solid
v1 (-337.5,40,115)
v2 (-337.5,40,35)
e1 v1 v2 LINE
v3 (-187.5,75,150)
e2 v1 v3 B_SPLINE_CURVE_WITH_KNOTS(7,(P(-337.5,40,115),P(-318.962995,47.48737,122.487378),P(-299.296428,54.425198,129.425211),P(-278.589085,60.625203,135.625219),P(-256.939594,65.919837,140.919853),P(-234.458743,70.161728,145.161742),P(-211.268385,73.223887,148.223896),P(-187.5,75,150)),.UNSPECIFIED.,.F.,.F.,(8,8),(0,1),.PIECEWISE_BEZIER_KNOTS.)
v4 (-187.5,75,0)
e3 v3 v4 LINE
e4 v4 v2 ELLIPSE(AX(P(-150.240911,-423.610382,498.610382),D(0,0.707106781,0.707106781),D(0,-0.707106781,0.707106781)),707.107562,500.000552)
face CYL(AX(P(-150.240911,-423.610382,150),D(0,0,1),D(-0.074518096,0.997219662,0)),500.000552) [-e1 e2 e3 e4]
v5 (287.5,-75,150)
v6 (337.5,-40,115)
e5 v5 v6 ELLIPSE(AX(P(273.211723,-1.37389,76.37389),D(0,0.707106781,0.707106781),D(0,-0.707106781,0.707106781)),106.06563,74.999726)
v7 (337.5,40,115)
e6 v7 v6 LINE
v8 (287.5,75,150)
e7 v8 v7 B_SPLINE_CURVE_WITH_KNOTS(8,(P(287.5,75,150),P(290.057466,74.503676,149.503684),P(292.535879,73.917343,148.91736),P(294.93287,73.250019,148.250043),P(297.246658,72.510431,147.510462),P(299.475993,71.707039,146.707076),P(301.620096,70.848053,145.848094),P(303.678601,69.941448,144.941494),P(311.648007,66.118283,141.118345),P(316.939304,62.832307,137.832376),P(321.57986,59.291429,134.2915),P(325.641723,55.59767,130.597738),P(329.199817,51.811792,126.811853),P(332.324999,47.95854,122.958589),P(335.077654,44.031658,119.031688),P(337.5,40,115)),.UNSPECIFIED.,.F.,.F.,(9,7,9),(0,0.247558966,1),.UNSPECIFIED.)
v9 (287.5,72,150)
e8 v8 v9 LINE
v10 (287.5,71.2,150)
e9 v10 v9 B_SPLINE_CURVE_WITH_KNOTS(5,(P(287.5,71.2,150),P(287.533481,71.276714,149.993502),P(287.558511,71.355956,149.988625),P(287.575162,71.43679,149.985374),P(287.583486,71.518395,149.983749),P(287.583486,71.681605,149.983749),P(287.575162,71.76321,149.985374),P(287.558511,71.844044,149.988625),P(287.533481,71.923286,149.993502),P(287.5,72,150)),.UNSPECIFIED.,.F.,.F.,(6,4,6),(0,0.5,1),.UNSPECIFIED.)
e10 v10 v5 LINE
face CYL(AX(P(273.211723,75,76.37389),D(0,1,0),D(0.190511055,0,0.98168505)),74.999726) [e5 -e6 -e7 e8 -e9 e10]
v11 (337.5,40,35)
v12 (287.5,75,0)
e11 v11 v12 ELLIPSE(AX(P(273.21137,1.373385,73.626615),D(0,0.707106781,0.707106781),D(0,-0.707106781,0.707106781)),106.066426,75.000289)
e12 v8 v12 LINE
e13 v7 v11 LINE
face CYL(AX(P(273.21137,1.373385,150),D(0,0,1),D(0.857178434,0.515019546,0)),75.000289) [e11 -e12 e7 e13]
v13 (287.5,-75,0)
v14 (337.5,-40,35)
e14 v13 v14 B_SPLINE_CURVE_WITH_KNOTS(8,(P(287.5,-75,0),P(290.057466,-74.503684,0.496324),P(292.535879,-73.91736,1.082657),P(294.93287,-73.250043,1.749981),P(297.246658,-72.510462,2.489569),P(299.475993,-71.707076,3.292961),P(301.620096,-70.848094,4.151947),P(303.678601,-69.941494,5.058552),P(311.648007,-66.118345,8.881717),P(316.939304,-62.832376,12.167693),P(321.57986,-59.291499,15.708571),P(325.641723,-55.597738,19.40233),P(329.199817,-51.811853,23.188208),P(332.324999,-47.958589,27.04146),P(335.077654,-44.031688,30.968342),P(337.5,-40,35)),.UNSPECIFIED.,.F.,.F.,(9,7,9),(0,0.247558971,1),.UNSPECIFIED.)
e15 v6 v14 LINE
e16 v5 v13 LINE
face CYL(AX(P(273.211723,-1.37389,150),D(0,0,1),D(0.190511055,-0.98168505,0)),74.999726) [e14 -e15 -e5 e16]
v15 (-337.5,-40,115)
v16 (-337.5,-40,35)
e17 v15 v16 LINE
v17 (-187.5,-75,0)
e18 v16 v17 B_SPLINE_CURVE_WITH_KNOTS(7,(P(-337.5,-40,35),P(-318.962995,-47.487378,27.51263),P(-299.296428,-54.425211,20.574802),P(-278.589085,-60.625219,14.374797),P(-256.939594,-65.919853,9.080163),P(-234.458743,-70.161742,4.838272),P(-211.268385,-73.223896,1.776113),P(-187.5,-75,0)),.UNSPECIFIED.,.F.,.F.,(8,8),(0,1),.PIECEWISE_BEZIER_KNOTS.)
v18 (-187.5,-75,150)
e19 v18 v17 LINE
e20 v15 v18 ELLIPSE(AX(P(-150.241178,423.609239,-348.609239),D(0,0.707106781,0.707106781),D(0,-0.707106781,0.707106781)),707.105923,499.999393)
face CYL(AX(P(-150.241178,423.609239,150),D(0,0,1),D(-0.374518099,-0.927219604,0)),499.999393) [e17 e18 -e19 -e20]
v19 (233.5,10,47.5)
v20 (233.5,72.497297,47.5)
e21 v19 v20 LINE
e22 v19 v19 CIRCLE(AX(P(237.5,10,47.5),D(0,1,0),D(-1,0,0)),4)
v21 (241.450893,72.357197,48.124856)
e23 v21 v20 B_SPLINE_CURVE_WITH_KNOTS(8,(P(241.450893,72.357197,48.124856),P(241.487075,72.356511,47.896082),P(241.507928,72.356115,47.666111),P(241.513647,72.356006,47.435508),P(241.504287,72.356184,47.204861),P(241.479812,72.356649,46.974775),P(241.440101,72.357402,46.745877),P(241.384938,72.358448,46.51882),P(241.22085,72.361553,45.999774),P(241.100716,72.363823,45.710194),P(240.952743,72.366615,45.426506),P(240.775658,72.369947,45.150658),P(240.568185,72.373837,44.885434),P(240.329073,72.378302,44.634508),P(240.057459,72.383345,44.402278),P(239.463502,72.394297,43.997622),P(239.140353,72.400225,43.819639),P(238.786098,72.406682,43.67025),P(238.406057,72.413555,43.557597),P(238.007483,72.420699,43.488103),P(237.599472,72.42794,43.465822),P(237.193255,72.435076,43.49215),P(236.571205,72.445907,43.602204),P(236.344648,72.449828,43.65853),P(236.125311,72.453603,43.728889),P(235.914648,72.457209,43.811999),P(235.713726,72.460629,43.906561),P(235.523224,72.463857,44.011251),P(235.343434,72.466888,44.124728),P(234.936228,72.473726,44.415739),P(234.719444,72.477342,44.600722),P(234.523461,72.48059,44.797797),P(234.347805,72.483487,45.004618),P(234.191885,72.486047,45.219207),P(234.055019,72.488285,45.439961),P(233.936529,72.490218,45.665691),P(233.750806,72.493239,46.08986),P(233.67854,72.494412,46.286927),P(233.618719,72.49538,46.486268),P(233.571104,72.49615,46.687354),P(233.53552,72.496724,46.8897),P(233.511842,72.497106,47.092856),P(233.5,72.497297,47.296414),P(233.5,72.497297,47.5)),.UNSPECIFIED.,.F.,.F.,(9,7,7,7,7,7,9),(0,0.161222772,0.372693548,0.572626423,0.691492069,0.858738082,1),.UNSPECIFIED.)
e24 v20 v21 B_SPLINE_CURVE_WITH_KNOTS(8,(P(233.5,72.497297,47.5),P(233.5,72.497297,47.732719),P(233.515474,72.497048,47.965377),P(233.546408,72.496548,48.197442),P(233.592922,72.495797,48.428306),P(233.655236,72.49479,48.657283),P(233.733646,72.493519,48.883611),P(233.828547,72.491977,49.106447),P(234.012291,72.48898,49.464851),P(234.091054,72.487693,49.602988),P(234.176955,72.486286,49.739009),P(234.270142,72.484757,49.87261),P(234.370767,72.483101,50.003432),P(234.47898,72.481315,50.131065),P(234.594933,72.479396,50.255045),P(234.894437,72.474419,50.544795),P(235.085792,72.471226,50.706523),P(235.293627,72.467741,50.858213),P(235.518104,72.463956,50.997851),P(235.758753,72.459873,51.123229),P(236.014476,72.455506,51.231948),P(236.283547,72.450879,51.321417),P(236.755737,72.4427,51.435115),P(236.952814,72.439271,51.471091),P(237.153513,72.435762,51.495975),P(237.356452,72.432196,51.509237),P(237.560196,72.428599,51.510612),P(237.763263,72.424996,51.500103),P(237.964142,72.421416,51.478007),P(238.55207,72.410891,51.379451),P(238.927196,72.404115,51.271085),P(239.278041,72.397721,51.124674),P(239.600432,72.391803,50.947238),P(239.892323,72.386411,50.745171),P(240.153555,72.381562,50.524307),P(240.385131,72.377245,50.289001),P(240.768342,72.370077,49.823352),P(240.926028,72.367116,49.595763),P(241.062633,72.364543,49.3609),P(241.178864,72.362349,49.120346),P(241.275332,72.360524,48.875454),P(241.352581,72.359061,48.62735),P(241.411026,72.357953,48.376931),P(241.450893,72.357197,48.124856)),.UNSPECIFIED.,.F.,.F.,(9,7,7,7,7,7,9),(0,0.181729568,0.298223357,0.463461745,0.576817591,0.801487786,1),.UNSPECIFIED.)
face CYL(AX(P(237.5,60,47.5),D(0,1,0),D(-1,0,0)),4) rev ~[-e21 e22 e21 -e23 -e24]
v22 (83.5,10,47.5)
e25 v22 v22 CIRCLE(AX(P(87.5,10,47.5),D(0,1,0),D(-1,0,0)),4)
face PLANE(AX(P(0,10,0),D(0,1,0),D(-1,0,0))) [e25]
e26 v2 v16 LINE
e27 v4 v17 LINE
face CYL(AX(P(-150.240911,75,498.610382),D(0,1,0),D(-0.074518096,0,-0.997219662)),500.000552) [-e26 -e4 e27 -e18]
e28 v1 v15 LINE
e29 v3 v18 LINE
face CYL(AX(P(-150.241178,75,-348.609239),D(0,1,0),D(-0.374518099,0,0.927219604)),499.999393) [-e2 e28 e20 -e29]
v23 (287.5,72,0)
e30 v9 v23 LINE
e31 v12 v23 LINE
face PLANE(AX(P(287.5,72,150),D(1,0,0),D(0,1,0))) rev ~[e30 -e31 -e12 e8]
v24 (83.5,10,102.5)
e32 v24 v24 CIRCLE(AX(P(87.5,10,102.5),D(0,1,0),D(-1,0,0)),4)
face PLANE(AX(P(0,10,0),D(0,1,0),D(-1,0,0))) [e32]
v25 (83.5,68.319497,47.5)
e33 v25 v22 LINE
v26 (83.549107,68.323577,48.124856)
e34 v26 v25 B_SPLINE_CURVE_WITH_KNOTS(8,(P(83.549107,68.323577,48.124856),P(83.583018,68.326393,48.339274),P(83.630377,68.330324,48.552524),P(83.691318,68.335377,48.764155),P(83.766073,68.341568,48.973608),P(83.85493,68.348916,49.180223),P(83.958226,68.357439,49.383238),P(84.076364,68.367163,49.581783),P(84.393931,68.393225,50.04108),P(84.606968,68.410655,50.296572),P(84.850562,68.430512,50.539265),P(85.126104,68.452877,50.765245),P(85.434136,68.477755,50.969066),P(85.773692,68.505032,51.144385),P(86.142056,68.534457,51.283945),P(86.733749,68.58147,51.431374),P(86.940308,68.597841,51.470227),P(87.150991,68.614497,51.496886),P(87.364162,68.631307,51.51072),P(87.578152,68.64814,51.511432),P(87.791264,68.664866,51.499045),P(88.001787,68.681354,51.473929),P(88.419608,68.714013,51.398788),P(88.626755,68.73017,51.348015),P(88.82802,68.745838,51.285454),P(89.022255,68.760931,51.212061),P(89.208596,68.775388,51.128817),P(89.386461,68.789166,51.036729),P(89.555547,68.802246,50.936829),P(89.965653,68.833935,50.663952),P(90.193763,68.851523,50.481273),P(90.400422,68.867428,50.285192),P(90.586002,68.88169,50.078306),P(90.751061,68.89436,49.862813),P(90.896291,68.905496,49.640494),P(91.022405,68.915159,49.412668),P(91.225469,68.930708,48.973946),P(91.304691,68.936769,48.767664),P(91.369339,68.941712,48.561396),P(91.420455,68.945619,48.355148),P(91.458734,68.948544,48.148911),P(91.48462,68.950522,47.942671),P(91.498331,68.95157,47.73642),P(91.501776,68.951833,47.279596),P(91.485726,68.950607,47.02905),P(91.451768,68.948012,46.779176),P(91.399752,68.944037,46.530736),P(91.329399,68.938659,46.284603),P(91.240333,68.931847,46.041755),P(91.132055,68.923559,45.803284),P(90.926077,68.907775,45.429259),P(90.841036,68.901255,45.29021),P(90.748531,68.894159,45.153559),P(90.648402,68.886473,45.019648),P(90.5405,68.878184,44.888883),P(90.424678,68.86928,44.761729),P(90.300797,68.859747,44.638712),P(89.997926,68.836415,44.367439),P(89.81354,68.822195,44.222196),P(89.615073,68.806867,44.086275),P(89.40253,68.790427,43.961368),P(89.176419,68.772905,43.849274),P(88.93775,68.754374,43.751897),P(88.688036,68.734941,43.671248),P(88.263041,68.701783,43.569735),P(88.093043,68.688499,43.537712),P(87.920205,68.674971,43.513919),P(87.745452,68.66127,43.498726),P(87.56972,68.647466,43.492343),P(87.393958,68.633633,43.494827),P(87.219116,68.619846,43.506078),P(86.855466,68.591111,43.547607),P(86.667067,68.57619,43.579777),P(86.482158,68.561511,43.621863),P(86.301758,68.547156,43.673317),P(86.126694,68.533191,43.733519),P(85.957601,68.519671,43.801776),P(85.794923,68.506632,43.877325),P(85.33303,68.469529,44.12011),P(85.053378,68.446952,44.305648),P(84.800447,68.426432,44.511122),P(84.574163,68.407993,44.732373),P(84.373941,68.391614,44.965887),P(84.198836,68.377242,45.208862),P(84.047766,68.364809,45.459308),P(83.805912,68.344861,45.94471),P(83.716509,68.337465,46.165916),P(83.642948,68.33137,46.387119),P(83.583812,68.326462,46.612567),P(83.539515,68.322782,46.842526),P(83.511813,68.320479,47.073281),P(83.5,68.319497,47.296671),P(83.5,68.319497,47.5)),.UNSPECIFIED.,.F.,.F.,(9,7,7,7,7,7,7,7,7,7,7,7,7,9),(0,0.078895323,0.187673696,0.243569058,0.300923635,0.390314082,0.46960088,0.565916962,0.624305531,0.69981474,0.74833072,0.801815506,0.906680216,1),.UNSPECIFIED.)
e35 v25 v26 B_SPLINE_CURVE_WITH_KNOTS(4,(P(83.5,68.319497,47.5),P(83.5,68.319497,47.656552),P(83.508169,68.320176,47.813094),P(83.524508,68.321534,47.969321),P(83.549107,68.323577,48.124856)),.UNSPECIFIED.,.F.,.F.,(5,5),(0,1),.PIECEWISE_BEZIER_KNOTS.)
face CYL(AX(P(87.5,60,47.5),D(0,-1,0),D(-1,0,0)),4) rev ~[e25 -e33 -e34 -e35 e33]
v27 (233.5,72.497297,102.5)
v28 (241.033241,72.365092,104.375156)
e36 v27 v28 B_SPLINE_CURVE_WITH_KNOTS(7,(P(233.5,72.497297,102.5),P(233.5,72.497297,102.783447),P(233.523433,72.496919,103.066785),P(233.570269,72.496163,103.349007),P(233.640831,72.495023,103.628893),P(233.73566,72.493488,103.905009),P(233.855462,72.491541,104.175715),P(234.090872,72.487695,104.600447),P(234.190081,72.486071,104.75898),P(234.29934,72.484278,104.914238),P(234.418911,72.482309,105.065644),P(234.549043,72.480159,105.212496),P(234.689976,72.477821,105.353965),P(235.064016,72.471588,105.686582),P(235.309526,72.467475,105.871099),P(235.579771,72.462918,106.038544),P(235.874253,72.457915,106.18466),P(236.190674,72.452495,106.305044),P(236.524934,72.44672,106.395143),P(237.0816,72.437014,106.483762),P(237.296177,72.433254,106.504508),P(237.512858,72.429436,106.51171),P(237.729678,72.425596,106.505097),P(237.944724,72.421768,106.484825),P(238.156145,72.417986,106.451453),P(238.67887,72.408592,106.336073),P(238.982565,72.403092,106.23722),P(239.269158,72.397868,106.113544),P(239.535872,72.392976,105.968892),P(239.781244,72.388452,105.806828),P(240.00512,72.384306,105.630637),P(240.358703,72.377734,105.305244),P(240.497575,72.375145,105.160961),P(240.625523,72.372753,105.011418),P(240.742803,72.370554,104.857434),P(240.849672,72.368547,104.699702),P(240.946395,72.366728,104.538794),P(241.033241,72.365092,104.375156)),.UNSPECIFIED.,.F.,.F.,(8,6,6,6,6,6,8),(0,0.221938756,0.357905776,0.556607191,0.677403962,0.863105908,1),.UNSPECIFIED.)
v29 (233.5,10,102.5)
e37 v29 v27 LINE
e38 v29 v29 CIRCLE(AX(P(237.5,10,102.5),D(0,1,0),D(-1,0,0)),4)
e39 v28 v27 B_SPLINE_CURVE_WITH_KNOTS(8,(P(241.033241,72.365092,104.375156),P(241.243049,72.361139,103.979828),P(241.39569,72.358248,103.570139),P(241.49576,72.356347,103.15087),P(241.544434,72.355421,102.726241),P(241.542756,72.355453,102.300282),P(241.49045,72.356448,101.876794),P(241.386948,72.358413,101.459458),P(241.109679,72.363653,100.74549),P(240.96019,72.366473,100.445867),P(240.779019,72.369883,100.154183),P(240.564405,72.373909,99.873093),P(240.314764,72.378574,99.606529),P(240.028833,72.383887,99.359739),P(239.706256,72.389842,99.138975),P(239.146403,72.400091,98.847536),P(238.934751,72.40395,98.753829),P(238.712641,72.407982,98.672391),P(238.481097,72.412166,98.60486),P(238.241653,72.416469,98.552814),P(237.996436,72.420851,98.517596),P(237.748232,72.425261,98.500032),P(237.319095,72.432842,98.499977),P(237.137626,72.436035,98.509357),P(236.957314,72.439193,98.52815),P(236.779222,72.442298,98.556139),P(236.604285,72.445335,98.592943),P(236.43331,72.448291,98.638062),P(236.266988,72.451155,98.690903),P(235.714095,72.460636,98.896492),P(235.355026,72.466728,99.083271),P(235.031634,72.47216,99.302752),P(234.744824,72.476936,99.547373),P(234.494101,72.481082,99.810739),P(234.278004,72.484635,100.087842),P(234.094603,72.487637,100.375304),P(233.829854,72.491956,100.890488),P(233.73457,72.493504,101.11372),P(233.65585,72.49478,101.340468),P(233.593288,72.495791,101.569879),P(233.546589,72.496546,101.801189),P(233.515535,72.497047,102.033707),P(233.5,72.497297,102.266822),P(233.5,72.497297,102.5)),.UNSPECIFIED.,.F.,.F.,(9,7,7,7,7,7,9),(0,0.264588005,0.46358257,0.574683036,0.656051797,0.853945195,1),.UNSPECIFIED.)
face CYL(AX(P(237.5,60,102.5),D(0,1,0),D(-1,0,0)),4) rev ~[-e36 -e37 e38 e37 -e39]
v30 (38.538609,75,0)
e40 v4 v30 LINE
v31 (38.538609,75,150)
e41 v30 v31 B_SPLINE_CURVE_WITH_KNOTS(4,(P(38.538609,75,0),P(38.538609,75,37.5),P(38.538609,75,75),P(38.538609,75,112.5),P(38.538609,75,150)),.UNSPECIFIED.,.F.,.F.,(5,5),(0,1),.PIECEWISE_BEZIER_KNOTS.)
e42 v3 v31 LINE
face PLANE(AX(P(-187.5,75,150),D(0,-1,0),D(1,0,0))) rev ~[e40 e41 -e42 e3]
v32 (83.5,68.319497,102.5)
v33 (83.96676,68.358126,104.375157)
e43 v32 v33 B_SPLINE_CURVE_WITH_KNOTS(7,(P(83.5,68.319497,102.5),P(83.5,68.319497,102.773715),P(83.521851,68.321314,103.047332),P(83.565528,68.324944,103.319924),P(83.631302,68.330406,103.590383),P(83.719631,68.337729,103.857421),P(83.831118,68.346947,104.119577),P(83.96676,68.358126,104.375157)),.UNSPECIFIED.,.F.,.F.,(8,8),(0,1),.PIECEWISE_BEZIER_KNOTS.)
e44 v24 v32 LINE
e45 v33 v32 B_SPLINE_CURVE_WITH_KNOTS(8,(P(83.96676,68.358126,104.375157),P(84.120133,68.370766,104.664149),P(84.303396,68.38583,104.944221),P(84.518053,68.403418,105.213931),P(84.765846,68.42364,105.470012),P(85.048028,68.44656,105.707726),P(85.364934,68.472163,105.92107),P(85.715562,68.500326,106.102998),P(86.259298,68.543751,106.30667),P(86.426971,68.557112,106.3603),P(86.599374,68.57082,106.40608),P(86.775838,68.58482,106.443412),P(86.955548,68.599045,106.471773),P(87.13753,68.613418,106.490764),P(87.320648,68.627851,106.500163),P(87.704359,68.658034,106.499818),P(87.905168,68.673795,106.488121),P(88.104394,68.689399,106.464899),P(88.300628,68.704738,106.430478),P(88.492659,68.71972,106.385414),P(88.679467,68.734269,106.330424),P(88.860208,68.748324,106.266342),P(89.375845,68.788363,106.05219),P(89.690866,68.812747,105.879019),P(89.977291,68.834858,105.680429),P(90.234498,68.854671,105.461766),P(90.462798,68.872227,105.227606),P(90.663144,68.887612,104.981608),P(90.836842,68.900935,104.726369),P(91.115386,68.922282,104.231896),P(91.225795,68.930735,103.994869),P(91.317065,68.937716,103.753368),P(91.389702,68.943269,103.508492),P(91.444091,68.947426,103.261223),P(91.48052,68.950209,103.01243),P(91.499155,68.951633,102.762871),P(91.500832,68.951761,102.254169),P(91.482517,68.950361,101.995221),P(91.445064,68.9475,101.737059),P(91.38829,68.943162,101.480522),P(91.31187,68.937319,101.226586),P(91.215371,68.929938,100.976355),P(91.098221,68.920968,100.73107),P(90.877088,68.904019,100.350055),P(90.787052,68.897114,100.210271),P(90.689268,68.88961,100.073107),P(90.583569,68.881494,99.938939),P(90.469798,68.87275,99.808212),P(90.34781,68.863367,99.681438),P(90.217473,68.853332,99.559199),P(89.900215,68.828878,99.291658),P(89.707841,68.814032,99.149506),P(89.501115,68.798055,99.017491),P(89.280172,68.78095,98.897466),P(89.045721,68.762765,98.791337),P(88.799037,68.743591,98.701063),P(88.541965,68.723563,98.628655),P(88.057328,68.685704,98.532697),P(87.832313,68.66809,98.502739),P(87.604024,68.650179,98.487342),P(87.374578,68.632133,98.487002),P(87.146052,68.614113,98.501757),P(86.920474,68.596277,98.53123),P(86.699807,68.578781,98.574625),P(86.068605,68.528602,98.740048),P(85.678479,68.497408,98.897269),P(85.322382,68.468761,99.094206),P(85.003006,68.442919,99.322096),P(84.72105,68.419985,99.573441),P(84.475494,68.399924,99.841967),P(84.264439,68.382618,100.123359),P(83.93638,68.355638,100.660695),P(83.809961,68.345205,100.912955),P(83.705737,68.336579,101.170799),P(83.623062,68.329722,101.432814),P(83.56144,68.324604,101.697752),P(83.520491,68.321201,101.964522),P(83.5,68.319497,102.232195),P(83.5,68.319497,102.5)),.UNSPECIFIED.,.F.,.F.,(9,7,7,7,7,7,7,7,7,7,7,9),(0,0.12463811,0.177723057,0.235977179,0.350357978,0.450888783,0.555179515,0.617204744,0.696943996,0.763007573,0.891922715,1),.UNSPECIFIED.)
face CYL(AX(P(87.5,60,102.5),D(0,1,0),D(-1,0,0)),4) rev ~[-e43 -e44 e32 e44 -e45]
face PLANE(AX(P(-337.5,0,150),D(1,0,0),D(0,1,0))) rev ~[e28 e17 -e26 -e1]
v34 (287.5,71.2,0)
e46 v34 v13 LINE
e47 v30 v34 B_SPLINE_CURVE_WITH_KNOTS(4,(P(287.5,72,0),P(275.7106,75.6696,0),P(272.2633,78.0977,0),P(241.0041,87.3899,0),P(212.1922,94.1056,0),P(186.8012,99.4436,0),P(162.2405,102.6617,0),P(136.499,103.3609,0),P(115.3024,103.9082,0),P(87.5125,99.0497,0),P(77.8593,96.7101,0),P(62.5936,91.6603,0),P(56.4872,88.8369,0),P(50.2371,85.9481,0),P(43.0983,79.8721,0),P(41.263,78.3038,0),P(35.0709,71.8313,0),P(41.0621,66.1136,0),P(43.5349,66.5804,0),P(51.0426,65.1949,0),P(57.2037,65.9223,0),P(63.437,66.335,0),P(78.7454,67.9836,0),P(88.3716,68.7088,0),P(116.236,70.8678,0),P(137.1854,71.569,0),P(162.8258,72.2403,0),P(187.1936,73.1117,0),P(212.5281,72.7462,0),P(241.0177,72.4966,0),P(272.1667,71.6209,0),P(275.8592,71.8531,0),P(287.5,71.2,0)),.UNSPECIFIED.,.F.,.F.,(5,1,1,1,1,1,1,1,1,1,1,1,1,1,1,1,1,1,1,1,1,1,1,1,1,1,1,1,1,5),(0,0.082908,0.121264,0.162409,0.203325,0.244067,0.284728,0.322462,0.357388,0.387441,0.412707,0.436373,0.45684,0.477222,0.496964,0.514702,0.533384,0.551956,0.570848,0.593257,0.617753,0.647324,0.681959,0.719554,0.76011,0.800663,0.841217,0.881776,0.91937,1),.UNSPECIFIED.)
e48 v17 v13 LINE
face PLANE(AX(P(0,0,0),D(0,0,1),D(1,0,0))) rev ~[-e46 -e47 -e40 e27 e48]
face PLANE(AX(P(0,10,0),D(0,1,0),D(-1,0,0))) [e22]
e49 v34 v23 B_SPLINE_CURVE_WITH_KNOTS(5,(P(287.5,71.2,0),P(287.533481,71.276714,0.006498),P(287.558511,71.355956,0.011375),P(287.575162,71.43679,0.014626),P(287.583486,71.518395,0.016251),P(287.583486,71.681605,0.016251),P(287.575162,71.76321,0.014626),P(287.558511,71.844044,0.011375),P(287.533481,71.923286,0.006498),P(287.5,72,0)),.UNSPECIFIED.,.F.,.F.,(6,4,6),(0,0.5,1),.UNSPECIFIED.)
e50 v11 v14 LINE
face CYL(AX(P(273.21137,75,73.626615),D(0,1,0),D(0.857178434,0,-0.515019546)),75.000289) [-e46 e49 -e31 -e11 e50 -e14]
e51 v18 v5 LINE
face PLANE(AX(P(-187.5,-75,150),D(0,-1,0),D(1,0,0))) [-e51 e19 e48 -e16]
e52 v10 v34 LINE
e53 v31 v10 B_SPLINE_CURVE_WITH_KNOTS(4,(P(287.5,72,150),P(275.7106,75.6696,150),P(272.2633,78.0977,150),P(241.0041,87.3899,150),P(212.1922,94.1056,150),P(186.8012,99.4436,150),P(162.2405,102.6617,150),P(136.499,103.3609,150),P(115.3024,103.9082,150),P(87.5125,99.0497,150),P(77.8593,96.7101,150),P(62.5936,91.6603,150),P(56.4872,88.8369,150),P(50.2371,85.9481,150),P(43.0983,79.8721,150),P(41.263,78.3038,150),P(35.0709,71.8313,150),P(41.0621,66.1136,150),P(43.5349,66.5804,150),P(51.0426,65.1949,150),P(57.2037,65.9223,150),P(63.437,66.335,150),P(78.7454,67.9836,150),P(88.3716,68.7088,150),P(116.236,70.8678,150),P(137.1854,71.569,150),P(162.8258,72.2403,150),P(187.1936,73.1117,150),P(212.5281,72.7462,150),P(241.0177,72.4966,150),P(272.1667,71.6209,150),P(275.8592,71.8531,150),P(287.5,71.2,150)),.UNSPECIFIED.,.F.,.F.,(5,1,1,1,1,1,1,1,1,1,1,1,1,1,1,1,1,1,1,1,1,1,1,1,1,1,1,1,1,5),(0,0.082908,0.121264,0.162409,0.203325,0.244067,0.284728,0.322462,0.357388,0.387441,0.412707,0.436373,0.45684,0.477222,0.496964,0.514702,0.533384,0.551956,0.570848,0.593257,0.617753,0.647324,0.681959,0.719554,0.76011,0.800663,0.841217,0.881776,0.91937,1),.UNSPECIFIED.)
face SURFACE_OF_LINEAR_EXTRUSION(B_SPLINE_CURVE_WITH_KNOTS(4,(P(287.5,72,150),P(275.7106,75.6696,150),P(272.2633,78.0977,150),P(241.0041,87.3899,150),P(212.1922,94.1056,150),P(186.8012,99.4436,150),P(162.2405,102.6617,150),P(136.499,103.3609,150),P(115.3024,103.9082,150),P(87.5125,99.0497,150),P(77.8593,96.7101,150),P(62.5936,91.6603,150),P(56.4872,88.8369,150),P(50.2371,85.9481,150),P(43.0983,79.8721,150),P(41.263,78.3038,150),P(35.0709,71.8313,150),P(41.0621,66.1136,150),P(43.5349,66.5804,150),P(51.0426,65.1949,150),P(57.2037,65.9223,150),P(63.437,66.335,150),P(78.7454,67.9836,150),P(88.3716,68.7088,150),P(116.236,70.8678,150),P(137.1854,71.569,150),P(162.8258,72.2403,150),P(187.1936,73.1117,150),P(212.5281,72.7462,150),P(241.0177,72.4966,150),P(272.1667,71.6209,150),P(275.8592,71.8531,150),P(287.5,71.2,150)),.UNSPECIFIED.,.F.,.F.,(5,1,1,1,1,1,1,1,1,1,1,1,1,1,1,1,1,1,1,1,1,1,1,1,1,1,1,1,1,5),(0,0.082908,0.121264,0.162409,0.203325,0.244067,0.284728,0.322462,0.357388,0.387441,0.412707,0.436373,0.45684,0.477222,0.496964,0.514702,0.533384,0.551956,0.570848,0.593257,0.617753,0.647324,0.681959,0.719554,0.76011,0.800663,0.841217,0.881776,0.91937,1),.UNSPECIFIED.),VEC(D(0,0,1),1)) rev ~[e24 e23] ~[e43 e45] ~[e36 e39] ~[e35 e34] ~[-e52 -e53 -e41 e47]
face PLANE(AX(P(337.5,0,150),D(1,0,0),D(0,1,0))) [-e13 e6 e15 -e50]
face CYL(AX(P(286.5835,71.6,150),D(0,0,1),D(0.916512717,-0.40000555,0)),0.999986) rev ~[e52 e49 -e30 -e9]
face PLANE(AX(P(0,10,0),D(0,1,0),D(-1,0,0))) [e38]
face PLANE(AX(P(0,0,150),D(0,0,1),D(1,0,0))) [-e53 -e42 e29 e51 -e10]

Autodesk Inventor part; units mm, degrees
ref_plane "YZ Plane" through (0, 0, 0) normal (1, 0, 0) x (0, 1, 0)
ref_plane "XY Plane" through (0, 0, 0) normal (0, 0, 1) x (1, 0, 0)
sketch "Sketch1" plane through (0, 0, 0) normal (0, 0, 1) x (1, 0, 0)
  line L0 (-337.5, 75) -> (337.5, 75)
  line L1 (337.5, 75) -> (337.5, -75)
  line L2 (337.5, -75) -> (-337.5, -75)
  line L3 (-337.5, -75) -> (-337.5, 75)
  line L4 (-337.5, 75) -> (337.5, -75) construction
  line L5 (337.5, 75) -> (-337.5, -75) construction
  point P0 (0, 0)
  dimension "d0" = 675
  dimension "d1" = 150
extrude "Extrusion1" add sketch "Sketch1" along normal blind 150
sketch "Sketch2" plane through (0, 0, 150) normal (0, 0, 1) x (1, 0, 0)
  line L0 (-400, 225) -> (400, 225)
  line L1 (400, 225) -> (400, -225)
  line L2 (400, -225) -> (-400, -225)
  line L3 (-400, -225) -> (-400, 225)
  line L4 (-337.5, 0) -> (-187.5, 0)
  line L5 (-337.5, 0) -> (-337.5, 40)
  line L6 (-337.5, 0) -> (-337.5, -40)
  line L7 (337.5, 0) -> (287.5, 0)
  line L8 (337.5, 0) -> (337.5, 40)
  line L9 (337.5, 0) -> (337.5, -40)
  arc A0 (-187.5, 75) -> (-337.5, 40) centre (-150.241, -423.6098) ccw
  line L10 (-187.5, 75) -> (287.5, 75)
  arc A1 (337.5, 40) -> (287.5, 75) centre (273.2116, 1.3736) ccw
  arc A2 (-337.5, -40) -> (-187.5, -75) centre (-150.241, 423.6098) ccw
  line L11 (-187.5, -75) -> (287.5, -75)
  arc A3 (287.5, -75) -> (337.5, -40) centre (273.2116, -1.3736) ccw
  point P0 (0, 0)
  dimension "d4" = 800
  dimension "d5" = 450
  dimension "d14" = 50
  dimension "d15" = 40
  dimension "d16" = 40
  dimension "d17" = 500
  dimension "d18" = 75
extrude "Extrusion2" cut sketch "Sketch2" against normal blind 150
sketch "Sketch3" plane through (-187.5, 75, 0) normal (0, 1, 0) x (1, 0, 0)
  line L0 (-312.5, 400) -> (687.5, 400)
  line L1 (687.5, 400) -> (687.5, -400)
  line L2 (687.5, -400) -> (-312.5, -400)
  line L3 (-312.5, -400) -> (-312.5, 400)
  line L4 (525, 0) -> (525, -150) projected
  line L5 (525, -75) -> (475, -75)
  line L6 (-150, -150) -> (-150, 0) projected
  line L7 (-150, -75) -> (-150, -35)
  line L8 (0, 0) -> (475, 0) projected
  arc A0 (0, 0) -> (-150, -35) centre (37.259, -498.6098) ccw
  line L9 (525, -75) -> (525, -35)
  line L10 (525, 0) -> (475, 0) projected
  arc A1 (525, -35) -> (475, 0) centre (460.7116, -73.6264) ccw
  line L11 (-150, -75) -> (-150, -115)
  arc A2 (-150, -115) -> (0, -150) centre (37.259, 348.6098) ccw
  line L12 (525, -75) -> (525, -115)
  arc A3 (475, -150) -> (525, -115) centre (460.7116, -76.3736) ccw
  line L13 (475, -150) -> (0, -150) projected
  line L14 (0, -150) -> (475, -150)
  point P0 (187.5, 0)
  dimension "d23" = 40
  dimension "d24" = 500
  dimension "d25" = 40
  dimension "d26" = 75
extrude "Extrusion3" cut sketch "Sketch3" against normal blind 150 contours L0 L1 L2 L3 | L4 A1 L10
sketch "Sketch4" plane through (0, 0, 150) normal (0, 0, 1) x (1, 0, 0)
  spline S0 degree 4 poles (287.5, 72) (275.7106, 75.6696) (272.2633, 78.0977) (241.0041, 87.3899) (212.1922, 94.1056) (186.8012, 99.4436) (162.2405, 102.6617) (136.499, 103.3609) (115.3024, 103.9082) (87.5125, 99.0497) (77.8593, 96.7101) (62.5936, 91.6603) (56.4872, 88.8369) (50.2371, 85.9481) (43.0983, 79.8721) (41.263, 78.3038) (35.0709, 71.8313) (41.0621, 66.1136) (43.5349, 66.5804) (51.0426, 65.1949) (57.2037, 65.9223) (63.437, 66.335) (78.7454, 67.9836) (88.3716, 68.7088) (116.236, 70.8678) (137.1854, 71.569) (162.8258, 72.2403) (187.1936, 73.1117) (212.5281, 72.7462) (241.0177, 72.4966) (272.1667, 71.6209) (275.8592, 71.8531) (287.5, 71.2) knots 0 0 0 0 0 0.082908 0.121264 0.162409 0.203325 0.244067 0.284728 0.322462 0.357388 0.387441 0.412707 0.436373 0.45684 0.477222 0.496964 0.514702 0.533384 0.551956 0.570848 0.593257 0.617753 0.647324 0.681959 0.719554 0.76011 0.800663 0.841217 0.881776 0.91937 1 1 1 1 1
  arc A0 (287.5, 71.2) -> (287.5, 72) centre (286.5835, 71.6) ccw
  point P0 (0, 0)
  point P1 (274.89, 76.355)
  point P2 (262.2875, 80.71)
  point P3 (237.1175, 87.97)
  point P4 (211.975, 94.0325)
  point P5 (186.8575, 99.02)
  point P6 (161.785, 102.1575)
  point P7 (136.7575, 103.3225)
  point P8 (111.775, 102.5875)
  point P9 (86.8675, 98.68)
  point P10 (74.4425, 95.465)
  point P11 (62.0425, 91.2)
  point P12 (55.855, 88.53)
  point P13 (49.685, 85.06)
  point P14 (43.5475, 80.2425)
  point P15 (40.49, 77.395)
  point P16 (37.5, 71.6)
  point P17 (40.73, 67.15)
  point P18 (43.875, 66.3)
  point P19 (50.14, 65.645)
  point P20 (56.385, 65.7925)
  point P21 (62.6225, 66.3375)
  point P22 (75.095, 67.555)
  point P23 (87.57, 68.6475)
  point P24 (112.5275, 70.43)
  point P25 (137.5025, 71.54)
  point P26 (162.485, 72.275)
  point P27 (187.47, 72.86)
  point P28 (212.4725, 72.77)
  point P29 (237.48, 72.43)
  point P30 (262.4925, 71.94)
  point P31 (274.9975, 71.7075)
  point P32 (287.5, 75)
  dimension "d31" = 1
extrude "Extrusion4" cut sketch "Sketch4" against normal blind 150
sketch "Sketch5" plane through (0, 0, 150) normal (0, 0, 1) x (1, 0, 0)
  spline S0 degree 4 poles (278.5919, 75) (280.4602, 74.3245) (282.4435, 73.6259) (284.707, 72.8694) (287.5, 72) knots 0 0 0 0 0 1 1 1 1 1 projected
  line L0 (287.5, 72) -> (287.5, 75) projected
  line L1 (287.5, 75) -> (278.5919, 75) projected
  point P0 (0, 0)
extrude "Extrusion5" cut sketch "Sketch5" against normal blind 150
sketch "Sketch8" plane through (0, 0, 150) normal (0, 0, 1) x (1, 0, 0)
  line L0 (38.5386, 75) -> (-187.5, 75) projected
  line L1 (-187.5, 75) -> (-187.5, -75) projected
  line L2 (-187.5, -75) -> (287.5, -75) projected
  line L3 (287.5, -75) -> (287.5, 71.2) projected
  arc A0 (-337.5, -40) -> (-187.5, -75) centre (-150.241, 423.6098) ccw projected
  line L4 (-187.5, 75) -> (-187.5, -75) projected
  arc A1 (-187.5, 75) -> (-337.5, 40) centre (-150.241, -423.6098) ccw projected
  line L5 (-337.5, -40) -> (-337.5, 40) projected
  line L6 (287.5, -75) -> (287.5, 71.2) projected
  arc A2 (287.5, -75) -> (337.5, -40) centre (273.2116, -1.3736) ccw projected
  line L7 (337.5, 40) -> (337.5, -40) projected
  arc A3 (337.5, 40) -> (287.5, 75) centre (273.2116, 1.3736) ccw projected
  line L8 (287.5, 72) -> (287.5, 75) projected
  point P0 (0, 0)
sketch "Sketch9" plane through (-187.5, 75, 150) normal (0, 1, 0) x (1, 0, 0)
  point P0 (187.5, 150)
sketch "Sketch10" plane through (-337.5, -40, 115) normal (-1, 0, 0) x (0, 0, 1)
  line L0 (0, 0) -> (0, 80) projected
  line L1 (0, 80) -> (-80, 80) projected
  line L2 (-80, 80) -> (-80, 0) projected
  line L3 (-80, 0) -> (0, 0) projected
  point P0 (-115, 40)
ref_plane "Work Plane1" through (0, 60, 0) normal (0, 1, 0) x (-1, 0, 0)
sketch "Sketch11" plane through (0, 60, 0) normal (0, 1, 0) x (-1, 0, 0)
  line L0 (-287.5, 0) -> (-287.5, 150) projected
  line L1 (-287.5, 75) -> (-287.5, 47.5)
  line L2 (-287.5, 47.5) -> (-237.5, 47.5)
  circle A0 centre (-237.5, 47.5) radius 4
  line L3 (-287.5, 75) -> (-187.5, 75)
  line L4 (-287.5, 47.5) -> (-87.5, 47.5)
  circle A1 centre (-87.5, 47.5) radius 4
  circle A2 centre (-237.5, 102.5) radius 4
  circle A3 centre (-87.5, 102.5) radius 4
  point P0 (0, 0)
  dimension "d70" = 27.5
  dimension "d71" = 50
  dimension "d72" = 8
  dimension "d73" = 100
  dimension "d74" = 200
  dimension "d75" = 8
extrude "Extrusion8" cut sketch "Sketch11" against normal mid plane 100
